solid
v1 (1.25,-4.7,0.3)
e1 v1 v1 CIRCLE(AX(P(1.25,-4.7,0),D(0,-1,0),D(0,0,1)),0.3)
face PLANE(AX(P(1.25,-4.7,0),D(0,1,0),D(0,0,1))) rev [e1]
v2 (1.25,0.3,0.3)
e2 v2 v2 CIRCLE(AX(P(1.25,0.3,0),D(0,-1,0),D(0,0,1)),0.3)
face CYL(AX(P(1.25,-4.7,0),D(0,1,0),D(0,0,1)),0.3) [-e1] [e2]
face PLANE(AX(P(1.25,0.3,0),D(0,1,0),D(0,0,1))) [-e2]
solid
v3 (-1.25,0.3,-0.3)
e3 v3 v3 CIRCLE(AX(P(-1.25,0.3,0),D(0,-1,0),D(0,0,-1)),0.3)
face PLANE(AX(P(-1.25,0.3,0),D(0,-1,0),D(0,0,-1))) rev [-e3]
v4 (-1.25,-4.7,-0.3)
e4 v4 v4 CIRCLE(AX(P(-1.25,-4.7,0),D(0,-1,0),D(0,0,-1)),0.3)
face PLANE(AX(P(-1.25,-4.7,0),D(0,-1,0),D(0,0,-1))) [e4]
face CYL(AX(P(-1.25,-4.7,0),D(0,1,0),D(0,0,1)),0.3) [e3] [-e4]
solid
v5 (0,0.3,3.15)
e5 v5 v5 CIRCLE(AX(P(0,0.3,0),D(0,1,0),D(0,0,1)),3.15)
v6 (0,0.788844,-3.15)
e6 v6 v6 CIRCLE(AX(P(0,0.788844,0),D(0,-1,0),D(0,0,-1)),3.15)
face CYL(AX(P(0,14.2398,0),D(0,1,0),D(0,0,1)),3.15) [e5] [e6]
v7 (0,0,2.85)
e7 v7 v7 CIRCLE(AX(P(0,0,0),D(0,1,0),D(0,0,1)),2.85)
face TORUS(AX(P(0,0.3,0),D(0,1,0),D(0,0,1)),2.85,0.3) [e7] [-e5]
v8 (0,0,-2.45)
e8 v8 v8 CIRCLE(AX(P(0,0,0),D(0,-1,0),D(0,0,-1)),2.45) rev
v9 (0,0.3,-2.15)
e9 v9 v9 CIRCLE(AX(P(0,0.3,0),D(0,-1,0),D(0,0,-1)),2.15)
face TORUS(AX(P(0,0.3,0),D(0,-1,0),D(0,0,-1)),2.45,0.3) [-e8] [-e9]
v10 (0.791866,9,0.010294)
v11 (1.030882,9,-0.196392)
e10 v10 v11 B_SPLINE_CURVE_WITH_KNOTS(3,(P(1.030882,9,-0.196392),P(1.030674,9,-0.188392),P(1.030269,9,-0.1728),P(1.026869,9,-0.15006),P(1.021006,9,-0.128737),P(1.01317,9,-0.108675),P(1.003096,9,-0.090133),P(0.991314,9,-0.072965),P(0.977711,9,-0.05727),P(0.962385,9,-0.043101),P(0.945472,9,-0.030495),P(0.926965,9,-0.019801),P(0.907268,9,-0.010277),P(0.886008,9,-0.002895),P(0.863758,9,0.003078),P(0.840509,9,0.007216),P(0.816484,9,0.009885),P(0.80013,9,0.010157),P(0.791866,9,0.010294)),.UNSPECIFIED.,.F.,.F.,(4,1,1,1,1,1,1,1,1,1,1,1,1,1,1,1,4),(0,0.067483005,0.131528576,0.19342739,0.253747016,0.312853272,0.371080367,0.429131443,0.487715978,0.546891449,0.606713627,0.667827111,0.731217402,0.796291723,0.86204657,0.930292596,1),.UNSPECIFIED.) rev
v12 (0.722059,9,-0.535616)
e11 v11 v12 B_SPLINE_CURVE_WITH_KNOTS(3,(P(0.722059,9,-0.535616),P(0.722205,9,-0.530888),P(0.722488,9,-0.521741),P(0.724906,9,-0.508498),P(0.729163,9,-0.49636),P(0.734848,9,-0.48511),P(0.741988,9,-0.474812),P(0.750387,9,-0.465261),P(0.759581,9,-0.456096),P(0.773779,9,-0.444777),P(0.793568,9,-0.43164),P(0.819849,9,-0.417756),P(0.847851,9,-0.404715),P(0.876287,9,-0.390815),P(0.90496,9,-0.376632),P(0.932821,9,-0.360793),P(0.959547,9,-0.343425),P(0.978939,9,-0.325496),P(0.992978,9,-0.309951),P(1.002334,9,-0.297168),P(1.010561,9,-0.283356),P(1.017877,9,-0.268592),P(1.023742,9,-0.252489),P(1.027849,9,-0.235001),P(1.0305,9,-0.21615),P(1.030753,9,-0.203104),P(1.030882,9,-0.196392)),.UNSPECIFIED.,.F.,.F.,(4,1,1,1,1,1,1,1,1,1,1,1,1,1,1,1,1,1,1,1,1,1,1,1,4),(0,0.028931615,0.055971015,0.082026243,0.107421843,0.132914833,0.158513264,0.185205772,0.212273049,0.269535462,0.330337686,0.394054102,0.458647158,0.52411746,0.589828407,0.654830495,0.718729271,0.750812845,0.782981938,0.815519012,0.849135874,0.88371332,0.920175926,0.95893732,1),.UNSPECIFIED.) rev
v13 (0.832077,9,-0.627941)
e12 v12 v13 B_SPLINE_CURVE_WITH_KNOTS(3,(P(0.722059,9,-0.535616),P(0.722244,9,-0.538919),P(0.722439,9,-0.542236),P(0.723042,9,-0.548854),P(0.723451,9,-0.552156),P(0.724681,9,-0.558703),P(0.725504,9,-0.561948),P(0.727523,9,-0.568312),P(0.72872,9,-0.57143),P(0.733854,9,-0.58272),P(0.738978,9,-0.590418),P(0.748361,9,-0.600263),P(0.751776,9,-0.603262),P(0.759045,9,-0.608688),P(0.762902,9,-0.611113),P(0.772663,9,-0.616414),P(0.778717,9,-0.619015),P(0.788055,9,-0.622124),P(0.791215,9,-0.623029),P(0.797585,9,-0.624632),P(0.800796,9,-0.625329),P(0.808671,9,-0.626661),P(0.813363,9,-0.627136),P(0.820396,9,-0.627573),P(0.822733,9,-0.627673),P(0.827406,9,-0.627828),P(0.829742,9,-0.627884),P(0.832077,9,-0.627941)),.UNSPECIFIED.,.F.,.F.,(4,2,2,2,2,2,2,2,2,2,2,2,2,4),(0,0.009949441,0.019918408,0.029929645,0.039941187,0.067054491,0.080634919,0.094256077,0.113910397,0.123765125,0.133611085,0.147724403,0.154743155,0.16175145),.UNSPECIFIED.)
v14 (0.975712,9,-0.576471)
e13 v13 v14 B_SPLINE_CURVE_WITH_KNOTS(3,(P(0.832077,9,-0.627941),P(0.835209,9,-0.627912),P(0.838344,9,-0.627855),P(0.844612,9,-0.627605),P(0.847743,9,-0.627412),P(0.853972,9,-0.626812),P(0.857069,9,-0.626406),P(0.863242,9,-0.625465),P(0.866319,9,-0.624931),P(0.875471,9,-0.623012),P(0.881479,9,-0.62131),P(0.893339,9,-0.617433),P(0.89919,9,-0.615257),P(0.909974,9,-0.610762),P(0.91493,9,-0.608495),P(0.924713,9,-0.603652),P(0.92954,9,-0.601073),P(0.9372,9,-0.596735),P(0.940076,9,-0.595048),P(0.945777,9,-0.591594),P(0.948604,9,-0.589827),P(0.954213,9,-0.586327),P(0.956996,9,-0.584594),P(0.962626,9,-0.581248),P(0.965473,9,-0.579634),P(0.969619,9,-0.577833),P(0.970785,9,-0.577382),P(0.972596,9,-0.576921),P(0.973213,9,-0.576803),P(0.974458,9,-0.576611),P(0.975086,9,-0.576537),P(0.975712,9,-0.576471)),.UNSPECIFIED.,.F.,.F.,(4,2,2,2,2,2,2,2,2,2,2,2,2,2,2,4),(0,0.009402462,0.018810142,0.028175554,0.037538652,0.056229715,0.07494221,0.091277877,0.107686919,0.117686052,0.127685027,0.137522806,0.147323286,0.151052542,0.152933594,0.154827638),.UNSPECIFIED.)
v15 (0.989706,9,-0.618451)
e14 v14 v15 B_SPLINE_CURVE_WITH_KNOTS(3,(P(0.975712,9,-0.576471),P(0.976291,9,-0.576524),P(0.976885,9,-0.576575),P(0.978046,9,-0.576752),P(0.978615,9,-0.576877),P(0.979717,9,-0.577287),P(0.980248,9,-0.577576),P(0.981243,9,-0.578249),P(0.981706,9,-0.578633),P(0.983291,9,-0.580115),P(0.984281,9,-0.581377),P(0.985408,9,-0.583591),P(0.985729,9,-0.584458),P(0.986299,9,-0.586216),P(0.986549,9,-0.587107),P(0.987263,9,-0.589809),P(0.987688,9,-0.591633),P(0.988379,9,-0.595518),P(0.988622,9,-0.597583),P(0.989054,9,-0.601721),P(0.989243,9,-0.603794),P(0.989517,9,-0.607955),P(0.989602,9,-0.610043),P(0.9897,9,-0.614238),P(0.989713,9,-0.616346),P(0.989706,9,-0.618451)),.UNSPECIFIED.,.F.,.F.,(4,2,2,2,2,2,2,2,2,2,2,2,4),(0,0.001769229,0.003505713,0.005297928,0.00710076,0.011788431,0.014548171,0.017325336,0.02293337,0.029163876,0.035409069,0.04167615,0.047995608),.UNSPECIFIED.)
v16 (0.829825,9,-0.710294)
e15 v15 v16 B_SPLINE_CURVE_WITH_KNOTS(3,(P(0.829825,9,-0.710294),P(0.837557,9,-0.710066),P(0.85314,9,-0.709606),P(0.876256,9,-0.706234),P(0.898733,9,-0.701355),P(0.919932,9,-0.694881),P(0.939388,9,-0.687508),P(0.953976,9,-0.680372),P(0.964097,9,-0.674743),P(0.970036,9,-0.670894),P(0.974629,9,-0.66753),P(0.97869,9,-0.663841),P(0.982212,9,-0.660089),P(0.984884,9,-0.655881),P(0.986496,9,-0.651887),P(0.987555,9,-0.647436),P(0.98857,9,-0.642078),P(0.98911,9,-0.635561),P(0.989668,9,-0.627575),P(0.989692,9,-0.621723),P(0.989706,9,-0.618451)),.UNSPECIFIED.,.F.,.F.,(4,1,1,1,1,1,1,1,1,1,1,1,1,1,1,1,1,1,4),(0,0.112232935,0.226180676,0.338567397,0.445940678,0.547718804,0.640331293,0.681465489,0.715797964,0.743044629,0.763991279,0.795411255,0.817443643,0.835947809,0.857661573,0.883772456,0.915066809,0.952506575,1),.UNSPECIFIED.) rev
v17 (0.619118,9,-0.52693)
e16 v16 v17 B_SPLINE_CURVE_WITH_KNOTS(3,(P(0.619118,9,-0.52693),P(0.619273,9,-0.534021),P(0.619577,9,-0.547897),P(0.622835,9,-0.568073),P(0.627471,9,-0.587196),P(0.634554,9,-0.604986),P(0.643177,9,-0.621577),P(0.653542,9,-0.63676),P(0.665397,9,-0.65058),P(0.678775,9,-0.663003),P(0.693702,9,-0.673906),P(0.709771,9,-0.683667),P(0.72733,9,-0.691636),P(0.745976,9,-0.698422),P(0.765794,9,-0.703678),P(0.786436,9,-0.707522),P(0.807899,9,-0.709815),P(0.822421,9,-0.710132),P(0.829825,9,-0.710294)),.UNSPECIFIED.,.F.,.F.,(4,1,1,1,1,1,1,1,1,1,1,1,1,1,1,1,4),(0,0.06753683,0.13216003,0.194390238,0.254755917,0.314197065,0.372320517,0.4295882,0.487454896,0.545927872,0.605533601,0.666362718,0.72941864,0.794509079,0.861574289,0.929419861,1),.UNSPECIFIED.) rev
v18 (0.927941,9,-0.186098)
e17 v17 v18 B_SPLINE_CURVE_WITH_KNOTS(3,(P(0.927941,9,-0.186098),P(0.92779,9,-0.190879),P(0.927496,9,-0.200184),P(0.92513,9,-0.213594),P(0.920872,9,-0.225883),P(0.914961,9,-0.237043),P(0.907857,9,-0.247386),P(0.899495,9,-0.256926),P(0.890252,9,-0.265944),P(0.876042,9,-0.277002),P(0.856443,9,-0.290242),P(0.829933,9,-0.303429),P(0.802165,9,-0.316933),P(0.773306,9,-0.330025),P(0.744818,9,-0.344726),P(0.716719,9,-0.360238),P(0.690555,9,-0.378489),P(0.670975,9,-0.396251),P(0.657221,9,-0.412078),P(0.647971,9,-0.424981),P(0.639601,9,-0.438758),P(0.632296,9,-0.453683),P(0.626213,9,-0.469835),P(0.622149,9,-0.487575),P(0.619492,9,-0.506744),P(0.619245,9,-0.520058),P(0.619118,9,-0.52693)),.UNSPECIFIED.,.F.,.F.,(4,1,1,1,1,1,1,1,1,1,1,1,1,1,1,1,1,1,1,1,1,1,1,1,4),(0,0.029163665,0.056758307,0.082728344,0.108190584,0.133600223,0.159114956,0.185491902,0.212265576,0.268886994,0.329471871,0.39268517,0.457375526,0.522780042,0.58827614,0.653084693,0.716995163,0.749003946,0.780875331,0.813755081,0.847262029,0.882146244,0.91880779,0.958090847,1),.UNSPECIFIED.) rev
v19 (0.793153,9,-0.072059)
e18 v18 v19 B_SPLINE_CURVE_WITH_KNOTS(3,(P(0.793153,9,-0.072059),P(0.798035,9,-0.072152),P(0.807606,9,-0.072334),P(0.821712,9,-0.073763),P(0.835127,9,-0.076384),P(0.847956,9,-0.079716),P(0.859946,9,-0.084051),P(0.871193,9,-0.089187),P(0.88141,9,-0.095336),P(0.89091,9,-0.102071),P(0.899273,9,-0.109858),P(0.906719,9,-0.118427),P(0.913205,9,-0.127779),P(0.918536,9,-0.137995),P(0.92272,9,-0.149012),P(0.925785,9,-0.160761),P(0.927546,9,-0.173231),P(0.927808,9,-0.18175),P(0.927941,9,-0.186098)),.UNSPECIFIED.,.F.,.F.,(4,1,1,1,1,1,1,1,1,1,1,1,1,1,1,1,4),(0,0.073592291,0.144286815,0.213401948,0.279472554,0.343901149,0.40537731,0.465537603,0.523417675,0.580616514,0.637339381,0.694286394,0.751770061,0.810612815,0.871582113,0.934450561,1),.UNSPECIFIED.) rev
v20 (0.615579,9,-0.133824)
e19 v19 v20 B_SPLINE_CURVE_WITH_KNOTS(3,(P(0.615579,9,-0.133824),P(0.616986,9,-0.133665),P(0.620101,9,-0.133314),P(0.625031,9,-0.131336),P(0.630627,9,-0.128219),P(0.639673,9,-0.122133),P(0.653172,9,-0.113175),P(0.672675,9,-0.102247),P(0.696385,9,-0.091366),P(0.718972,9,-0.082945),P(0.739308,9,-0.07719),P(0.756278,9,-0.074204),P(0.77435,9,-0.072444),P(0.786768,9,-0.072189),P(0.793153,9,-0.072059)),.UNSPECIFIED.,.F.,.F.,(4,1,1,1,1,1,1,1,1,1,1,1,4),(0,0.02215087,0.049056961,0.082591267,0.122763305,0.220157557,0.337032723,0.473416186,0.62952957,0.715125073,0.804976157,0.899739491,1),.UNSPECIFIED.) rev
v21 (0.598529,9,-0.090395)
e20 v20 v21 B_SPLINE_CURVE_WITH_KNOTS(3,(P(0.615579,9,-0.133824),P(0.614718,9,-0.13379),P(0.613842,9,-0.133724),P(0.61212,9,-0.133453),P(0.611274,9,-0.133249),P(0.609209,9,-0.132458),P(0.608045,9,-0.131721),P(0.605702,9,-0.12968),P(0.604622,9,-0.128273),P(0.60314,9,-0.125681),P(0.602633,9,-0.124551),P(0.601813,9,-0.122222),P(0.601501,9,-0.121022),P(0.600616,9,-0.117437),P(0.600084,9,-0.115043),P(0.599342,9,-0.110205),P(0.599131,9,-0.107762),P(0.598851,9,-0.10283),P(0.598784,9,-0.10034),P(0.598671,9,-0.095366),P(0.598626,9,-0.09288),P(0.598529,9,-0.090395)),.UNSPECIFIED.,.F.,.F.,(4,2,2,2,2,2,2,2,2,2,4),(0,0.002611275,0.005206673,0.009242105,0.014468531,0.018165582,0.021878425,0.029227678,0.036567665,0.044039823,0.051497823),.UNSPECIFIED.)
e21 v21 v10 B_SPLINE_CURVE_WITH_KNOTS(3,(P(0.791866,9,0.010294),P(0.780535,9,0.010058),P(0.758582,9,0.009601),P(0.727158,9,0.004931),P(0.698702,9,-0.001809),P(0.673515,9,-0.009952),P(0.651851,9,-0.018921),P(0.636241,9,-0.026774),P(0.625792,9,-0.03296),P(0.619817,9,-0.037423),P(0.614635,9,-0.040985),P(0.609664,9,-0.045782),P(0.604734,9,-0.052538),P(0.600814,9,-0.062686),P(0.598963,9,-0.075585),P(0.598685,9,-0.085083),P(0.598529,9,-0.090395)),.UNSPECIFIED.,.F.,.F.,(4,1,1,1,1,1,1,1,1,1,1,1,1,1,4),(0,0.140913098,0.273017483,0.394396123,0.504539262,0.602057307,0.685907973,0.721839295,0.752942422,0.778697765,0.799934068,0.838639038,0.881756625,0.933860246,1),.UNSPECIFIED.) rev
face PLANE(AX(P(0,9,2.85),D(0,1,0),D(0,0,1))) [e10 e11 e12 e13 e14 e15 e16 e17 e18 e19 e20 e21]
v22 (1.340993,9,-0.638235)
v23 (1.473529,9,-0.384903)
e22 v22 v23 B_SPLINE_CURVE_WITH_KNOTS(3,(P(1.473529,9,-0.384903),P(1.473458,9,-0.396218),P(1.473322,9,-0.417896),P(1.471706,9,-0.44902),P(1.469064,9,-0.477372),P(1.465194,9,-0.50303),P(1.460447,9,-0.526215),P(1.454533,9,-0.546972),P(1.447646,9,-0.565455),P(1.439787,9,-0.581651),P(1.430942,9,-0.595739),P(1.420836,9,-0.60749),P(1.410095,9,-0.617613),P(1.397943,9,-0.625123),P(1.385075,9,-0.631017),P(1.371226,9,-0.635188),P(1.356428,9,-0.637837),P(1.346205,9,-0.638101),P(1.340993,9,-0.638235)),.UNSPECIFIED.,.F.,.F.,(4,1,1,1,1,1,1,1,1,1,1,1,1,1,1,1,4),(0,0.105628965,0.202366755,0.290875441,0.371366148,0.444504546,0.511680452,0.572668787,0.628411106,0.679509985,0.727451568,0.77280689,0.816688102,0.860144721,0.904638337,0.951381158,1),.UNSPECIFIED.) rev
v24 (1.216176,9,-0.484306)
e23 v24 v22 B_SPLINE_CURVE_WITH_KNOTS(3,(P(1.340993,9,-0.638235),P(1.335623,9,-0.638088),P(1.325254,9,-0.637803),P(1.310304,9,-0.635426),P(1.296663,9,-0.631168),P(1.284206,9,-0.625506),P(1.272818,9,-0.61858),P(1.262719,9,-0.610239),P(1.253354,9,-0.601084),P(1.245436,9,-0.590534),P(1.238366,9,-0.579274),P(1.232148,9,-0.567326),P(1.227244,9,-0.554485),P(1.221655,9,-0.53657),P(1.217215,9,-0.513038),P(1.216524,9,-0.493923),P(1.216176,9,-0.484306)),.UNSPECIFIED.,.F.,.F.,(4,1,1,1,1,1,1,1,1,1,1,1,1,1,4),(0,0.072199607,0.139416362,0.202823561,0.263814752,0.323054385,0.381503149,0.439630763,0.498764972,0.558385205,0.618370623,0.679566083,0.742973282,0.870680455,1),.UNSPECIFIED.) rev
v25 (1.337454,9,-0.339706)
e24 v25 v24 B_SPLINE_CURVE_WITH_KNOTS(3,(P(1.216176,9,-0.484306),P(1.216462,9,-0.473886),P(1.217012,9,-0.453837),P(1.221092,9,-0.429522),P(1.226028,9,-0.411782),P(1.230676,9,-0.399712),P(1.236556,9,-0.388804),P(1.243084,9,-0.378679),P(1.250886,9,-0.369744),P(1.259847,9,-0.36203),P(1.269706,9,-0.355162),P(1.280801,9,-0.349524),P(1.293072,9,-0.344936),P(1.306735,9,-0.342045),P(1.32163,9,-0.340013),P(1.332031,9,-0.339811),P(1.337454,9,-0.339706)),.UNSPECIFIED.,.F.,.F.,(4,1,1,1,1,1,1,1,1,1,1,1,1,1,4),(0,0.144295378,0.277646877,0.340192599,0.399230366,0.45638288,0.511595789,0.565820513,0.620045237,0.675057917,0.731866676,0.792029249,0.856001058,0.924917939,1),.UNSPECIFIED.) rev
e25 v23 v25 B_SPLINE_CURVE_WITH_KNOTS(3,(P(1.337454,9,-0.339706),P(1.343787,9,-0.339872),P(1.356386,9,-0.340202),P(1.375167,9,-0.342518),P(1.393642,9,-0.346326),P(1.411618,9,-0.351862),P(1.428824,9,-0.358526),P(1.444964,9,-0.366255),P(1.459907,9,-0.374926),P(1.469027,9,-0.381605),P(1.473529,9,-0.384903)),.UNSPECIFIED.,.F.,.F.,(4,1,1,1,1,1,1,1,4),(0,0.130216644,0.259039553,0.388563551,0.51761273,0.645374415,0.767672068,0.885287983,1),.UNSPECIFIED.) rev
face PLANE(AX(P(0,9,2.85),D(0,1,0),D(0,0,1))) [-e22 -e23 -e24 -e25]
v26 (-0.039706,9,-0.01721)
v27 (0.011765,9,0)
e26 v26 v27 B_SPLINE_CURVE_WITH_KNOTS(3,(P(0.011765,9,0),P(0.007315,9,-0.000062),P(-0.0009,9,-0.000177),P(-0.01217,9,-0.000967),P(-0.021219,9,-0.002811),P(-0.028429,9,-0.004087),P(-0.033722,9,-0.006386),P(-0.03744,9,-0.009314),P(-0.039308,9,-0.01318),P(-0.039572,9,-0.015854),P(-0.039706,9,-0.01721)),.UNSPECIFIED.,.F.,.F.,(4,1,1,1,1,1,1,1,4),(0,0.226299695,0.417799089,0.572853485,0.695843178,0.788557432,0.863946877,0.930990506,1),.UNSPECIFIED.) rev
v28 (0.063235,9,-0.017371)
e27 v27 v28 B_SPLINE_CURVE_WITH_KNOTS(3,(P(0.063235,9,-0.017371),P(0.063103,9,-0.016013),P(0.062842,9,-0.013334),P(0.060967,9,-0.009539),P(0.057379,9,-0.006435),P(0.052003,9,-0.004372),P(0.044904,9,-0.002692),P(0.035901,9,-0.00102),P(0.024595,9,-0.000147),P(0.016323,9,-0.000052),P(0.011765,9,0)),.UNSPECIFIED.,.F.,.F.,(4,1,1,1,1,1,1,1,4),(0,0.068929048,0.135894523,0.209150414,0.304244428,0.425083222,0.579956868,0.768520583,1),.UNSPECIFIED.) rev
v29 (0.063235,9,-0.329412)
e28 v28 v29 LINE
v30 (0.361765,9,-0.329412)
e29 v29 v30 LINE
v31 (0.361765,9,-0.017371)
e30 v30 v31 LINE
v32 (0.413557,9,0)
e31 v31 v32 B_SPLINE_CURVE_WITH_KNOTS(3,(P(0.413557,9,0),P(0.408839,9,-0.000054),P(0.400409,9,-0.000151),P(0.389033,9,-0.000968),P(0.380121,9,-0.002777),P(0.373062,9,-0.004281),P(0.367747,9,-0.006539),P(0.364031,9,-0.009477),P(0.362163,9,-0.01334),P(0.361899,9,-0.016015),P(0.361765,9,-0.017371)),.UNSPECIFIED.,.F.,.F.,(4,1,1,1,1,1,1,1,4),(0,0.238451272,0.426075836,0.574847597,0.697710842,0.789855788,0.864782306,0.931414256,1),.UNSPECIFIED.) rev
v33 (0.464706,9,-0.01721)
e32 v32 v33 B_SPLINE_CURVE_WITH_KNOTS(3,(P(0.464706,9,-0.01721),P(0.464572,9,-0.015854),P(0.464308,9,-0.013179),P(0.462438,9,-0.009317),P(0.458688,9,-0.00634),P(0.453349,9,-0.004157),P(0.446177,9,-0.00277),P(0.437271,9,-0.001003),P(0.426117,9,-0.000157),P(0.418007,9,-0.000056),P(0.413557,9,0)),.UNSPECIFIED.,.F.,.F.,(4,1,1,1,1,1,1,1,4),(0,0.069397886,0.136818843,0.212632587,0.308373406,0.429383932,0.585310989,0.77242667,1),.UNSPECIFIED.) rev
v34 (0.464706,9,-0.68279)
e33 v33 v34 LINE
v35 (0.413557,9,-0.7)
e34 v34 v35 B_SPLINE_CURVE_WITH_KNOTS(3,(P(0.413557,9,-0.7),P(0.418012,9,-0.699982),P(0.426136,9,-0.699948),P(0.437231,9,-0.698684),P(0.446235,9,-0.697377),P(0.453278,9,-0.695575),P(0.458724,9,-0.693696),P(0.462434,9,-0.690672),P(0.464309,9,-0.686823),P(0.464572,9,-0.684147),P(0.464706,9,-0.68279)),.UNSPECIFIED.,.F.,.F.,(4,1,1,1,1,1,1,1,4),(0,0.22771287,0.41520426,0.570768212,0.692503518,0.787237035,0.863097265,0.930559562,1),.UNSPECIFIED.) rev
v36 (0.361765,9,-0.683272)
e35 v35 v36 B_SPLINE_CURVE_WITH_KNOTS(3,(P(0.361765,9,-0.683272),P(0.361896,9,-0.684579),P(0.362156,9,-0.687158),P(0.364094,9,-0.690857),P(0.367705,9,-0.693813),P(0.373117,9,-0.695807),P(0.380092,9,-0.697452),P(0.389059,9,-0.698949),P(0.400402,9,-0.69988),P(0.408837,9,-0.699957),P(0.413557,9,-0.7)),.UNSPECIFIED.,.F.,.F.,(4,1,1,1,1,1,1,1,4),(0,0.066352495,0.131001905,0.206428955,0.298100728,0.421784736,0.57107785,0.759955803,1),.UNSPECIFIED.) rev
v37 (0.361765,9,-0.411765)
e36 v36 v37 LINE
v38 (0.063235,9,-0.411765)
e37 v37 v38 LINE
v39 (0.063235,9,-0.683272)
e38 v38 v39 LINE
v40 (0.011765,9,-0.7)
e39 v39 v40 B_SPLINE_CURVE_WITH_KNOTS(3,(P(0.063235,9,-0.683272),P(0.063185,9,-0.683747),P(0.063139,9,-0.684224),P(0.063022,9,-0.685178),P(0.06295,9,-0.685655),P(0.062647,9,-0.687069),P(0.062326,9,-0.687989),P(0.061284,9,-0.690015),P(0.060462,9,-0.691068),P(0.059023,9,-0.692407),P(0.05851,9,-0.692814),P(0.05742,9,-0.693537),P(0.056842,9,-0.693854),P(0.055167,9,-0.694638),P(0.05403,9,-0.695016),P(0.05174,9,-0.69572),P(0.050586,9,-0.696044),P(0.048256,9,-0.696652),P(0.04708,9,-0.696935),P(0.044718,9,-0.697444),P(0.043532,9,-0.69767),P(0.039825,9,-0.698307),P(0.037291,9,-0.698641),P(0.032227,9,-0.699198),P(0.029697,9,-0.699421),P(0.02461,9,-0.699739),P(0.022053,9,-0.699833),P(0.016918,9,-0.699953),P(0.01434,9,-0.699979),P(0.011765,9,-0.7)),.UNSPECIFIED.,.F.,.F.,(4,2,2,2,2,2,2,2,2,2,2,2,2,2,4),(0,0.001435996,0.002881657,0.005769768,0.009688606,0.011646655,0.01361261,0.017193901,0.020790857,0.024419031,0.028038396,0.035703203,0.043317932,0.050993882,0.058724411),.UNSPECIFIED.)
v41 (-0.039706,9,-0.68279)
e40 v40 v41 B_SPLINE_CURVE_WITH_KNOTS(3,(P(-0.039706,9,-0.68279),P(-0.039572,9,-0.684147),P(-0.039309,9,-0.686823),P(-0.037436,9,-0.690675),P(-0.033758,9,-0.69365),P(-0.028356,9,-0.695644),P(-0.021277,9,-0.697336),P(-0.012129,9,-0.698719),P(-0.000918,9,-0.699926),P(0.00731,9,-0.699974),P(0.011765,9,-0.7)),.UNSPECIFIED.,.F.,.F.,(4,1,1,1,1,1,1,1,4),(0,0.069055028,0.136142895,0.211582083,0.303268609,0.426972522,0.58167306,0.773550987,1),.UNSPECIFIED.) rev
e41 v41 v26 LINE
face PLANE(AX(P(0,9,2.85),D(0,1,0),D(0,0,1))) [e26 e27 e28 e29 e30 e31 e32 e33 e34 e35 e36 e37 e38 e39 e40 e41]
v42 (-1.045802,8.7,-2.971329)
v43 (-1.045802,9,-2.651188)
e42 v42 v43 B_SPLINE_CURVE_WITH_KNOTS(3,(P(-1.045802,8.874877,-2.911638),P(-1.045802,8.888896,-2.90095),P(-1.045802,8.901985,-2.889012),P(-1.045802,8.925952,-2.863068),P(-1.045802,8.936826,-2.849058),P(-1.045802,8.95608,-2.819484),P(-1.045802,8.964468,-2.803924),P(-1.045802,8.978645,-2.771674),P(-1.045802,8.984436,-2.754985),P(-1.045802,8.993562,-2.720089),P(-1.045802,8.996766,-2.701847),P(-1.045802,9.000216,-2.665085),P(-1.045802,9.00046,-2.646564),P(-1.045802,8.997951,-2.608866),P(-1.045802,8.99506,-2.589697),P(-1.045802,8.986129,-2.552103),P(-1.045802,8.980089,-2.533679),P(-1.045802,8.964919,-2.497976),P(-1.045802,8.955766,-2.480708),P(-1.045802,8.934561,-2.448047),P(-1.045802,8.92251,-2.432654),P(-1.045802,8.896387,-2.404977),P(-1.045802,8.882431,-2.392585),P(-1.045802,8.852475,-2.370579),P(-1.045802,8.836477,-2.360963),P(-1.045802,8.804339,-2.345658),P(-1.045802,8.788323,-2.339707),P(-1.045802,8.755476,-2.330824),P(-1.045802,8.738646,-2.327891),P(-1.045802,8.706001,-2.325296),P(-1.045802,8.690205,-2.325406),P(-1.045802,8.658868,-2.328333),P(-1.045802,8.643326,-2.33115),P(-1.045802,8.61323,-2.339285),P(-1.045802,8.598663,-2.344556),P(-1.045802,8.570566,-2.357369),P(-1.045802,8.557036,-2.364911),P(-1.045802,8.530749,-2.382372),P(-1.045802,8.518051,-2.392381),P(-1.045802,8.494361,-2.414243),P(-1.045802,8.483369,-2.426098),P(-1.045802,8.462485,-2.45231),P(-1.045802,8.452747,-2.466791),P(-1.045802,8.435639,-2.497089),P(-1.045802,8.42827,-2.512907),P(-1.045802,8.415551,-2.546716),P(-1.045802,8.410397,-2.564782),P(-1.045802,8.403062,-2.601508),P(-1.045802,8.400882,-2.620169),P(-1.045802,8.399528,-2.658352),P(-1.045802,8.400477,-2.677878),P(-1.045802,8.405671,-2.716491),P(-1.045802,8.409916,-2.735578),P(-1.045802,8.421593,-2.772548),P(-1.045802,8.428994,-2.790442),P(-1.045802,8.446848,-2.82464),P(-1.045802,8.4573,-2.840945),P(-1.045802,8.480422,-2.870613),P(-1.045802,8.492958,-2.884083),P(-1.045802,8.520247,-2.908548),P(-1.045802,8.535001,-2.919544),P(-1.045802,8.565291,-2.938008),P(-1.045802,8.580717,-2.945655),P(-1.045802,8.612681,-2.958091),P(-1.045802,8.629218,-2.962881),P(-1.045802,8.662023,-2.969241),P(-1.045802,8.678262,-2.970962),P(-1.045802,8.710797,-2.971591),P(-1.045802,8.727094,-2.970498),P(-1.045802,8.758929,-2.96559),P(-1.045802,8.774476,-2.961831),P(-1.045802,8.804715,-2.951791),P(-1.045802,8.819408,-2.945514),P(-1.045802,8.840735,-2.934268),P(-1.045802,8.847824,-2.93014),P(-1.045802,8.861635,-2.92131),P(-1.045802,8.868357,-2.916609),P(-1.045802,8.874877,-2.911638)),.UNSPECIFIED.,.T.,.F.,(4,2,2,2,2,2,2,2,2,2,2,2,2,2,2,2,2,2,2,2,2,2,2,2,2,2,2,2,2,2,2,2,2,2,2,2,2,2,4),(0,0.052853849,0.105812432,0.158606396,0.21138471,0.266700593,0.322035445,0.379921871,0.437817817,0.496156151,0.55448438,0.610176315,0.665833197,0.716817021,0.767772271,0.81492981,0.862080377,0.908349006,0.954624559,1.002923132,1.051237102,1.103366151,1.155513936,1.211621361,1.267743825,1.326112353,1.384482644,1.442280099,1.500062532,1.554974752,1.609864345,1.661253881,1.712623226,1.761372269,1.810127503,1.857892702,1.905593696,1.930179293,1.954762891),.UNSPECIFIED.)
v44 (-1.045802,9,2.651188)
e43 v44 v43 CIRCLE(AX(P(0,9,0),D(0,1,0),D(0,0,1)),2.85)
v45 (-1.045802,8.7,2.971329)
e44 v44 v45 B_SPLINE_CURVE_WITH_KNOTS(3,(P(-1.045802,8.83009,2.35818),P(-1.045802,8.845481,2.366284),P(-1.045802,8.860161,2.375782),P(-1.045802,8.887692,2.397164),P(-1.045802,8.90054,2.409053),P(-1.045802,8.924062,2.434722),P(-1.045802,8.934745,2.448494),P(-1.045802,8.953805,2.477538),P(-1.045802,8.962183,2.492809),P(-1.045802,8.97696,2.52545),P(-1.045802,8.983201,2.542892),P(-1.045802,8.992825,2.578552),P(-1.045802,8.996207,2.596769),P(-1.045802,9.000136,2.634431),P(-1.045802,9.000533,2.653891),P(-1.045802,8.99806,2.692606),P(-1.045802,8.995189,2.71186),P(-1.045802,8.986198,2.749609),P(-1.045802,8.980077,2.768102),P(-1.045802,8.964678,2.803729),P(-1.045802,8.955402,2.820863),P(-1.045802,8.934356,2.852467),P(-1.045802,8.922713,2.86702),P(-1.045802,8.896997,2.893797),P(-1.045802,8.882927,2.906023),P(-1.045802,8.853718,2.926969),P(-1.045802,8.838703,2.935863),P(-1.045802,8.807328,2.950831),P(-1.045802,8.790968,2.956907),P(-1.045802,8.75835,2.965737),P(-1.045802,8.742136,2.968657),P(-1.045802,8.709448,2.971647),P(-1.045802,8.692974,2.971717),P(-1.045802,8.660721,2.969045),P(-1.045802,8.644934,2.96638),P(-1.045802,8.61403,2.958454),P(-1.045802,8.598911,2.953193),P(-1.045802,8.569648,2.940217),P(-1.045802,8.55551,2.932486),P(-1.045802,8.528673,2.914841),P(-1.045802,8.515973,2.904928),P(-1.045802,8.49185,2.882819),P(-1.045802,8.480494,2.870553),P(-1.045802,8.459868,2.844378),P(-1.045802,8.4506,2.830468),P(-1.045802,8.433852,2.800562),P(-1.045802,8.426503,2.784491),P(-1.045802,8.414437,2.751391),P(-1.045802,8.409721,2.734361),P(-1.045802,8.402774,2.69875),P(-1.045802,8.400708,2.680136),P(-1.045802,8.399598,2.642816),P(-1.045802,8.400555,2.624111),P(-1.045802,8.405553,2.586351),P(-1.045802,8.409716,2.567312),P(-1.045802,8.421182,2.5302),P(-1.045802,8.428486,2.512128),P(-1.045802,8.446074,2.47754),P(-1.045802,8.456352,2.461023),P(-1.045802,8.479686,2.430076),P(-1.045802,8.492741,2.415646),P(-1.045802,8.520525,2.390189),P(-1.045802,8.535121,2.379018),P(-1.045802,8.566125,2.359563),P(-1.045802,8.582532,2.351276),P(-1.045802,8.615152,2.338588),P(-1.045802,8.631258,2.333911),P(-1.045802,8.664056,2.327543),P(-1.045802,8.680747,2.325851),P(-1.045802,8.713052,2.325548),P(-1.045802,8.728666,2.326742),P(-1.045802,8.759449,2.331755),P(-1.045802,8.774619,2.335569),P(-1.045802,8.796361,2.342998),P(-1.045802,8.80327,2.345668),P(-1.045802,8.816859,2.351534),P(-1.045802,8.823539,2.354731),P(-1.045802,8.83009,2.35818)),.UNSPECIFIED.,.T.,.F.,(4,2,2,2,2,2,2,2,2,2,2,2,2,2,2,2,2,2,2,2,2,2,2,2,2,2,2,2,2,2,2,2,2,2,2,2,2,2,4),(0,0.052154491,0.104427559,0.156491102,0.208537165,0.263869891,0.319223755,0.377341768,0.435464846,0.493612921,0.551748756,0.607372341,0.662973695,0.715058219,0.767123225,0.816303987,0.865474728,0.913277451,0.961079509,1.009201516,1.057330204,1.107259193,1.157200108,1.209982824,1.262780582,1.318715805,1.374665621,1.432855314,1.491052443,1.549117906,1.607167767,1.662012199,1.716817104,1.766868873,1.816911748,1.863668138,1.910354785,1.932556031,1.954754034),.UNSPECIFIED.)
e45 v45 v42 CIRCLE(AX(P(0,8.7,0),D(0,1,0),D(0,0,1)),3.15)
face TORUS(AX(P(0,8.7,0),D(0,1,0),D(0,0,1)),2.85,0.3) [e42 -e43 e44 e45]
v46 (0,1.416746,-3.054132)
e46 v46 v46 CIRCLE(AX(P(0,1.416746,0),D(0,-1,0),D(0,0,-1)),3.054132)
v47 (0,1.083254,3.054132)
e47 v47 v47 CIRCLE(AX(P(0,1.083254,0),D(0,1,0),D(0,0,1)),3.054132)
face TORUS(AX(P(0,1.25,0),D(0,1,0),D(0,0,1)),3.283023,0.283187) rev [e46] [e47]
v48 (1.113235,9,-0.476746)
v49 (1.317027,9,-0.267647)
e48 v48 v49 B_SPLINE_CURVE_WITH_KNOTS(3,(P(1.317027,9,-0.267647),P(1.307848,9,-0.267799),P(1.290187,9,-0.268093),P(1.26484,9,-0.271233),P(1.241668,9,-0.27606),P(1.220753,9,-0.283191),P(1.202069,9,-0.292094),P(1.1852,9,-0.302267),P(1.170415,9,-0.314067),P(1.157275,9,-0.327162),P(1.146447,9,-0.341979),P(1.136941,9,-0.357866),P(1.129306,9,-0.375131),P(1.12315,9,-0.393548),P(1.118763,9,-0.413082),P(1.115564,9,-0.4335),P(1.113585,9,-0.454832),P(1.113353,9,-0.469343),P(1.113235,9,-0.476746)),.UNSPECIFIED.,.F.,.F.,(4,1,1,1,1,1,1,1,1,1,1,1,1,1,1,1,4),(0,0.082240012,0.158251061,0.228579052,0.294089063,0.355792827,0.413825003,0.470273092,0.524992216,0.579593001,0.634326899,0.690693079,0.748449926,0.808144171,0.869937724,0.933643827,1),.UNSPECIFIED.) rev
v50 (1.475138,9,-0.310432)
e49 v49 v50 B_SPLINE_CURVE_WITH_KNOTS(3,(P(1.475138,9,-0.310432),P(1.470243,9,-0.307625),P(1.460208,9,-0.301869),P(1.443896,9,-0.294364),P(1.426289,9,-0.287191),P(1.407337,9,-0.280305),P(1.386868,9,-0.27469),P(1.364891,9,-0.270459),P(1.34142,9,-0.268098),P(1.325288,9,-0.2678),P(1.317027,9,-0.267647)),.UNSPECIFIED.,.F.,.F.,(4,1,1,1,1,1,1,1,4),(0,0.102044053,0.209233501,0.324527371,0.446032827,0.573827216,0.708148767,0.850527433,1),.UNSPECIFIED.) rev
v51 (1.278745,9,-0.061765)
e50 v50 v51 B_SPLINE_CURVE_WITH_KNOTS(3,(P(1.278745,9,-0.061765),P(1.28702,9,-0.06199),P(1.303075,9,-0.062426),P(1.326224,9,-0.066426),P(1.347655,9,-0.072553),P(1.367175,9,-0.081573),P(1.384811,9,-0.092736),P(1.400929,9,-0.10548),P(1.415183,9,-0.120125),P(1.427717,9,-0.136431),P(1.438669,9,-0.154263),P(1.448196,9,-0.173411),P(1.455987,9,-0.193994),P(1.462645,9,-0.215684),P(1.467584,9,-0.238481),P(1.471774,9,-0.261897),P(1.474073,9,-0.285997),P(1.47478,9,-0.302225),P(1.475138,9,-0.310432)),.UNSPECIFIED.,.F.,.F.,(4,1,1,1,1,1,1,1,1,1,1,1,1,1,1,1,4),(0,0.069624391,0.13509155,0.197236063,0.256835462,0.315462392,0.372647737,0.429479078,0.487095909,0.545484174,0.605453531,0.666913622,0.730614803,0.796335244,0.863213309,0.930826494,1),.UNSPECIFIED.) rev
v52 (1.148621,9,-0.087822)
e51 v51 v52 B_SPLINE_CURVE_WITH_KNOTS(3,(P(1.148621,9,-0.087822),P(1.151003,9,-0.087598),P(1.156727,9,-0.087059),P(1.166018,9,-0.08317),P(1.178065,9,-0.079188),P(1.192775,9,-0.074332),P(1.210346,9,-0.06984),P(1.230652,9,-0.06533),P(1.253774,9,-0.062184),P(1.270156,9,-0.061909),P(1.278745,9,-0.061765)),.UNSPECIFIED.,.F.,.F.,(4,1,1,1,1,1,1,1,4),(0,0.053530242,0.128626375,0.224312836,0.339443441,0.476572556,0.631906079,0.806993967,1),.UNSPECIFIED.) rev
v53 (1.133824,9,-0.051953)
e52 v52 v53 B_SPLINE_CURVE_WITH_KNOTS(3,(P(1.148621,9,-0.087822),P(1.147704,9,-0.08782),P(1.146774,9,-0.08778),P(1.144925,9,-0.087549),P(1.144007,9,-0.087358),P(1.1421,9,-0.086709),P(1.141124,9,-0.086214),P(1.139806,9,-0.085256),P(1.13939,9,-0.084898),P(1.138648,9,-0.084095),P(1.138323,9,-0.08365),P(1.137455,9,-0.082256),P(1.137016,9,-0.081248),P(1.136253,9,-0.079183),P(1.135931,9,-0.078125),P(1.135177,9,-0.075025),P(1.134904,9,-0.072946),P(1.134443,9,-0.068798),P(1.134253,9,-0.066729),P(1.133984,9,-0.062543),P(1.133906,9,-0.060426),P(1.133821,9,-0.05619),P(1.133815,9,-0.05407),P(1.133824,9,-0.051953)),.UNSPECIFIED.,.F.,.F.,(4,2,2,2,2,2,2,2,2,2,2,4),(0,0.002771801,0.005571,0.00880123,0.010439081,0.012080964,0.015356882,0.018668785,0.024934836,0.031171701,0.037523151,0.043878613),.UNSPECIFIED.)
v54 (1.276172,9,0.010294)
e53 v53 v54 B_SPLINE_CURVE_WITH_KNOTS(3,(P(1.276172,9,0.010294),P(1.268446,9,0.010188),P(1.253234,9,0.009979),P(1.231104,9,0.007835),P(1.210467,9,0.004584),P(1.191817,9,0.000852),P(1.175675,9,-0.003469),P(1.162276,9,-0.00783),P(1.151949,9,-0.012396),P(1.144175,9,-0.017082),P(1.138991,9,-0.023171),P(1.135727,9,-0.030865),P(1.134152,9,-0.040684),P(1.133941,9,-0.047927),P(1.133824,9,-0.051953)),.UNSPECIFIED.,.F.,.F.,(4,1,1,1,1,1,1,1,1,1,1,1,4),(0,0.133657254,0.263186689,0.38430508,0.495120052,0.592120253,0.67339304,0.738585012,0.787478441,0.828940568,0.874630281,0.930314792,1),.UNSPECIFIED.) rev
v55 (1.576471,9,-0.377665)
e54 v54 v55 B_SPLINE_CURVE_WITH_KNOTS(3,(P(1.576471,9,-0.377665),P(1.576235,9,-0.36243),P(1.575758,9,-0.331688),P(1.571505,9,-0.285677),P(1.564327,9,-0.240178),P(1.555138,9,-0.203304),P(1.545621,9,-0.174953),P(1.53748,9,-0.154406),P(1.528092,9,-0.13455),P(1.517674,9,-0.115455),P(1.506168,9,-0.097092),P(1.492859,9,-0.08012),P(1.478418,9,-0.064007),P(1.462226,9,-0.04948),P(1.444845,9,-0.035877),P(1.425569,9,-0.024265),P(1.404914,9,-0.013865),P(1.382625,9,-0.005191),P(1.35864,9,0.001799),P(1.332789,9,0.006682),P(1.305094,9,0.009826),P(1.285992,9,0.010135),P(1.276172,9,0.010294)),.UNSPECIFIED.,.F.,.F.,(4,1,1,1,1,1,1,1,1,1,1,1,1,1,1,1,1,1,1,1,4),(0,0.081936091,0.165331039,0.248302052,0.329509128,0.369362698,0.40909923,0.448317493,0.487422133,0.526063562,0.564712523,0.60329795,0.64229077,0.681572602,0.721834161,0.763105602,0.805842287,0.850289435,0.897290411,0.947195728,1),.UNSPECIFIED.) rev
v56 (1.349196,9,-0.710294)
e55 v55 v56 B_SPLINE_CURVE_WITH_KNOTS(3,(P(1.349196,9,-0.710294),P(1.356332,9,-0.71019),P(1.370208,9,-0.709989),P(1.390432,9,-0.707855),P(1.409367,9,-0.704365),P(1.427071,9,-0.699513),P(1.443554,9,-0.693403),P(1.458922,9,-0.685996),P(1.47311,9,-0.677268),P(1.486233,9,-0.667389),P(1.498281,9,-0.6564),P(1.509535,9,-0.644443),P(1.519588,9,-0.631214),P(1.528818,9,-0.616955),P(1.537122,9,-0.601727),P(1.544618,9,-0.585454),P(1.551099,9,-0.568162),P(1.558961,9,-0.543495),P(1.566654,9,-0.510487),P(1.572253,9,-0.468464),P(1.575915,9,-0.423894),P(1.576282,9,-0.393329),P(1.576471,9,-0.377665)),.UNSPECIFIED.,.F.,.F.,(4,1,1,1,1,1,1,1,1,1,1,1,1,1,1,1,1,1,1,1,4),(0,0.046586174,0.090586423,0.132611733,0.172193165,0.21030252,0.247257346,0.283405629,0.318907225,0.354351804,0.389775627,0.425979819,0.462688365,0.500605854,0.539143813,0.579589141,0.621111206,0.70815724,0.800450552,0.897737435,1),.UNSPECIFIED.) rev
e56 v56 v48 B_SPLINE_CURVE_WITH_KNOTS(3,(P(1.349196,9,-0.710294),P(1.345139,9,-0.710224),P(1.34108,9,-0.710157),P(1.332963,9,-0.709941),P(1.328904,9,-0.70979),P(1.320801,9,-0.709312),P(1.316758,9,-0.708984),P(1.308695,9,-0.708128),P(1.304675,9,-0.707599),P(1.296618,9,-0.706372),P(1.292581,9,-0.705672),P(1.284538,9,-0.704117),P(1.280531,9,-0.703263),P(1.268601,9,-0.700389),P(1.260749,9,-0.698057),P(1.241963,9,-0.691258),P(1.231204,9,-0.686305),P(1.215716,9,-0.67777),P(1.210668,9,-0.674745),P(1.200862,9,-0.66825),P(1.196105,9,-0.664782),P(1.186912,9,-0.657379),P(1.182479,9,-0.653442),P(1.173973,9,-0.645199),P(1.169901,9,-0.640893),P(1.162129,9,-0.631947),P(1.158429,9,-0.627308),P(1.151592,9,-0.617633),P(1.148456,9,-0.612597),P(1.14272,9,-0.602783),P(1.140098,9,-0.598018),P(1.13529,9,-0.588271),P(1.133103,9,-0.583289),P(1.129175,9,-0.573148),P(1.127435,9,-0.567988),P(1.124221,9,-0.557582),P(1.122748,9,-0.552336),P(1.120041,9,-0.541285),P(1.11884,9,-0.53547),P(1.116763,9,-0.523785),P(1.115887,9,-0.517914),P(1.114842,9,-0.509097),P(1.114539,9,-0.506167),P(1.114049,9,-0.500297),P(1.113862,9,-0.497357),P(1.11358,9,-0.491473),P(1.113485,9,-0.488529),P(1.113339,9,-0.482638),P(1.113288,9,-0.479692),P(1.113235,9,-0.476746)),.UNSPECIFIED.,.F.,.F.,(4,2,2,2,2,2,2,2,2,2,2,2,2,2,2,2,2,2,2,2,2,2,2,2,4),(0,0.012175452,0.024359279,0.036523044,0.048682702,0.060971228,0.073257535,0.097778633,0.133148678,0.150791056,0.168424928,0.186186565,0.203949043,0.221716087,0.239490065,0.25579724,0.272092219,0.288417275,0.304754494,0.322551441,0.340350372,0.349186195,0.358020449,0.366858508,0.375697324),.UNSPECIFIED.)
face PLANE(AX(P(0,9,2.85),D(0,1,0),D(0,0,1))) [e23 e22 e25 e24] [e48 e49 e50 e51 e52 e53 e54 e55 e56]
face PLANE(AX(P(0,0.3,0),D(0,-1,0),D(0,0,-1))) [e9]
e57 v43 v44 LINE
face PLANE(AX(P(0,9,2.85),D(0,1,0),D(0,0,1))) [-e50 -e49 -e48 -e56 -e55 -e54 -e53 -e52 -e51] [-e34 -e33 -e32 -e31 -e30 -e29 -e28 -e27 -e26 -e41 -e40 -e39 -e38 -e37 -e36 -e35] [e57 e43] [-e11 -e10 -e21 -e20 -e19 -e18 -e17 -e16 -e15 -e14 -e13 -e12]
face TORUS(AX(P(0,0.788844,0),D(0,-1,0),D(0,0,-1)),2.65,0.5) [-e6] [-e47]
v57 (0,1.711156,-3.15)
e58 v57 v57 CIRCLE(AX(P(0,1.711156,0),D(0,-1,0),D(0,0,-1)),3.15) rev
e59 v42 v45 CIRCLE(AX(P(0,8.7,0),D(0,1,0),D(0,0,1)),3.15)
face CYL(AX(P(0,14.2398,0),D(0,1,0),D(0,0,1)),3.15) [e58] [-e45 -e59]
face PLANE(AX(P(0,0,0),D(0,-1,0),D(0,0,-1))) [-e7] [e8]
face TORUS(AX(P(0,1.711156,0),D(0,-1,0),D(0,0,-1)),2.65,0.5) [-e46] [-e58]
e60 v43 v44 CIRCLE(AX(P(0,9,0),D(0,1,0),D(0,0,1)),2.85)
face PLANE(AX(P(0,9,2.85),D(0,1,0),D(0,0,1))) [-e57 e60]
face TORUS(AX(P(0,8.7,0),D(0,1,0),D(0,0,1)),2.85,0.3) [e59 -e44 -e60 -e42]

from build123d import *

# Parameters (mm, degrees)
FILLET_1_R          = 0.5
SKETCH_2_R          = 2.15
CUT_EXTRUDE_1_DEPTH = 0.3
FILLET_2_R          = 0.3
SKETCH_3_R          = 0.3
EXTRUDE_1_DEPTH     = 5
EXTRUDE_1_2_DEPTH   = 5


with BuildPart() as part:
    # Эскиз1 → Повернуть1 (revolve)
    with BuildSketch(Plane(origin=(0, 0, 0), x_dir=(0, 0, -1), z_dir=(1, 0, 0))):
        with BuildLine():
            Line((0, 0), (-2.85, 0))
            ThreePointArc((-2.85, 0), (-3.062132034, 0.087867966), (-3.15, 0.3))
            Line((-3.15, 0.3), (-3.15, 1))
            ThreePointArc((-3.15, 1), (-2.999835492, 1.25), (-3.15, 1.5))
            Line((-3.15, 1.5), (-3.15, 8.7))
            ThreePointArc((-3.15, 8.7), (-3.062132034, 8.912132034), (-2.85, 9))
            Line((-2.85, 9), (0, 9))
            Line((0, 9), (0, 0))
        make_face()
    revolve(axis=Axis((0, 14.239800306, 0), (0, -1, 0)))

    # Скругление1
    fillet_1_edges = [part.edges().sort_by_distance(p)[0] for p in [
        (0, 1.5, -3.15),
        (0, 1, -3.15),
    ]]
    fillet(fillet_1_edges, radius=FILLET_1_R)

    # Эскиз2 → Вырез-Вытянуть1 (cut)
    with BuildSketch(Plane.XZ):
        with Locations(Location((0, 0, 0), (0, 0, 270))):
            Circle(SKETCH_2_R)
    extrude(amount=-CUT_EXTRUDE_1_DEPTH, mode=Mode.SUBTRACT)

    # Скругление2
    fillet_2_edges = [part.edges().sort_by_distance(p)[0] for p in [
        (0, 0, 2.15),
    ]]
    fillet(fillet_2_edges, radius=FILLET_2_R - 0.0001)  # a hair under: the kernel refuses the full size


with BuildPart() as body_2:
    # Эскиз3 → Бобышка-Вытянуть1 (new body)
    with BuildSketch(Plane.XZ.offset(-0.3)):
        with Locations(Location((-1.25, 0, 0), (0, 0, 270))):
            Circle(SKETCH_3_R)
    extrude(amount=EXTRUDE_1_DEPTH)


with BuildPart() as body_3:
    # Эскиз3 → Extrude 1 2 (new body)
    with BuildSketch(Plane.XZ.offset(-0.3)):
        with Locations(Location((1.25, 0, 0), (0, 0, 90))):
            Circle(SKETCH_3_R)
    extrude(amount=EXTRUDE_1_2_DEPTH)


solid = Compound([part.part, body_2.part, body_3.part])
